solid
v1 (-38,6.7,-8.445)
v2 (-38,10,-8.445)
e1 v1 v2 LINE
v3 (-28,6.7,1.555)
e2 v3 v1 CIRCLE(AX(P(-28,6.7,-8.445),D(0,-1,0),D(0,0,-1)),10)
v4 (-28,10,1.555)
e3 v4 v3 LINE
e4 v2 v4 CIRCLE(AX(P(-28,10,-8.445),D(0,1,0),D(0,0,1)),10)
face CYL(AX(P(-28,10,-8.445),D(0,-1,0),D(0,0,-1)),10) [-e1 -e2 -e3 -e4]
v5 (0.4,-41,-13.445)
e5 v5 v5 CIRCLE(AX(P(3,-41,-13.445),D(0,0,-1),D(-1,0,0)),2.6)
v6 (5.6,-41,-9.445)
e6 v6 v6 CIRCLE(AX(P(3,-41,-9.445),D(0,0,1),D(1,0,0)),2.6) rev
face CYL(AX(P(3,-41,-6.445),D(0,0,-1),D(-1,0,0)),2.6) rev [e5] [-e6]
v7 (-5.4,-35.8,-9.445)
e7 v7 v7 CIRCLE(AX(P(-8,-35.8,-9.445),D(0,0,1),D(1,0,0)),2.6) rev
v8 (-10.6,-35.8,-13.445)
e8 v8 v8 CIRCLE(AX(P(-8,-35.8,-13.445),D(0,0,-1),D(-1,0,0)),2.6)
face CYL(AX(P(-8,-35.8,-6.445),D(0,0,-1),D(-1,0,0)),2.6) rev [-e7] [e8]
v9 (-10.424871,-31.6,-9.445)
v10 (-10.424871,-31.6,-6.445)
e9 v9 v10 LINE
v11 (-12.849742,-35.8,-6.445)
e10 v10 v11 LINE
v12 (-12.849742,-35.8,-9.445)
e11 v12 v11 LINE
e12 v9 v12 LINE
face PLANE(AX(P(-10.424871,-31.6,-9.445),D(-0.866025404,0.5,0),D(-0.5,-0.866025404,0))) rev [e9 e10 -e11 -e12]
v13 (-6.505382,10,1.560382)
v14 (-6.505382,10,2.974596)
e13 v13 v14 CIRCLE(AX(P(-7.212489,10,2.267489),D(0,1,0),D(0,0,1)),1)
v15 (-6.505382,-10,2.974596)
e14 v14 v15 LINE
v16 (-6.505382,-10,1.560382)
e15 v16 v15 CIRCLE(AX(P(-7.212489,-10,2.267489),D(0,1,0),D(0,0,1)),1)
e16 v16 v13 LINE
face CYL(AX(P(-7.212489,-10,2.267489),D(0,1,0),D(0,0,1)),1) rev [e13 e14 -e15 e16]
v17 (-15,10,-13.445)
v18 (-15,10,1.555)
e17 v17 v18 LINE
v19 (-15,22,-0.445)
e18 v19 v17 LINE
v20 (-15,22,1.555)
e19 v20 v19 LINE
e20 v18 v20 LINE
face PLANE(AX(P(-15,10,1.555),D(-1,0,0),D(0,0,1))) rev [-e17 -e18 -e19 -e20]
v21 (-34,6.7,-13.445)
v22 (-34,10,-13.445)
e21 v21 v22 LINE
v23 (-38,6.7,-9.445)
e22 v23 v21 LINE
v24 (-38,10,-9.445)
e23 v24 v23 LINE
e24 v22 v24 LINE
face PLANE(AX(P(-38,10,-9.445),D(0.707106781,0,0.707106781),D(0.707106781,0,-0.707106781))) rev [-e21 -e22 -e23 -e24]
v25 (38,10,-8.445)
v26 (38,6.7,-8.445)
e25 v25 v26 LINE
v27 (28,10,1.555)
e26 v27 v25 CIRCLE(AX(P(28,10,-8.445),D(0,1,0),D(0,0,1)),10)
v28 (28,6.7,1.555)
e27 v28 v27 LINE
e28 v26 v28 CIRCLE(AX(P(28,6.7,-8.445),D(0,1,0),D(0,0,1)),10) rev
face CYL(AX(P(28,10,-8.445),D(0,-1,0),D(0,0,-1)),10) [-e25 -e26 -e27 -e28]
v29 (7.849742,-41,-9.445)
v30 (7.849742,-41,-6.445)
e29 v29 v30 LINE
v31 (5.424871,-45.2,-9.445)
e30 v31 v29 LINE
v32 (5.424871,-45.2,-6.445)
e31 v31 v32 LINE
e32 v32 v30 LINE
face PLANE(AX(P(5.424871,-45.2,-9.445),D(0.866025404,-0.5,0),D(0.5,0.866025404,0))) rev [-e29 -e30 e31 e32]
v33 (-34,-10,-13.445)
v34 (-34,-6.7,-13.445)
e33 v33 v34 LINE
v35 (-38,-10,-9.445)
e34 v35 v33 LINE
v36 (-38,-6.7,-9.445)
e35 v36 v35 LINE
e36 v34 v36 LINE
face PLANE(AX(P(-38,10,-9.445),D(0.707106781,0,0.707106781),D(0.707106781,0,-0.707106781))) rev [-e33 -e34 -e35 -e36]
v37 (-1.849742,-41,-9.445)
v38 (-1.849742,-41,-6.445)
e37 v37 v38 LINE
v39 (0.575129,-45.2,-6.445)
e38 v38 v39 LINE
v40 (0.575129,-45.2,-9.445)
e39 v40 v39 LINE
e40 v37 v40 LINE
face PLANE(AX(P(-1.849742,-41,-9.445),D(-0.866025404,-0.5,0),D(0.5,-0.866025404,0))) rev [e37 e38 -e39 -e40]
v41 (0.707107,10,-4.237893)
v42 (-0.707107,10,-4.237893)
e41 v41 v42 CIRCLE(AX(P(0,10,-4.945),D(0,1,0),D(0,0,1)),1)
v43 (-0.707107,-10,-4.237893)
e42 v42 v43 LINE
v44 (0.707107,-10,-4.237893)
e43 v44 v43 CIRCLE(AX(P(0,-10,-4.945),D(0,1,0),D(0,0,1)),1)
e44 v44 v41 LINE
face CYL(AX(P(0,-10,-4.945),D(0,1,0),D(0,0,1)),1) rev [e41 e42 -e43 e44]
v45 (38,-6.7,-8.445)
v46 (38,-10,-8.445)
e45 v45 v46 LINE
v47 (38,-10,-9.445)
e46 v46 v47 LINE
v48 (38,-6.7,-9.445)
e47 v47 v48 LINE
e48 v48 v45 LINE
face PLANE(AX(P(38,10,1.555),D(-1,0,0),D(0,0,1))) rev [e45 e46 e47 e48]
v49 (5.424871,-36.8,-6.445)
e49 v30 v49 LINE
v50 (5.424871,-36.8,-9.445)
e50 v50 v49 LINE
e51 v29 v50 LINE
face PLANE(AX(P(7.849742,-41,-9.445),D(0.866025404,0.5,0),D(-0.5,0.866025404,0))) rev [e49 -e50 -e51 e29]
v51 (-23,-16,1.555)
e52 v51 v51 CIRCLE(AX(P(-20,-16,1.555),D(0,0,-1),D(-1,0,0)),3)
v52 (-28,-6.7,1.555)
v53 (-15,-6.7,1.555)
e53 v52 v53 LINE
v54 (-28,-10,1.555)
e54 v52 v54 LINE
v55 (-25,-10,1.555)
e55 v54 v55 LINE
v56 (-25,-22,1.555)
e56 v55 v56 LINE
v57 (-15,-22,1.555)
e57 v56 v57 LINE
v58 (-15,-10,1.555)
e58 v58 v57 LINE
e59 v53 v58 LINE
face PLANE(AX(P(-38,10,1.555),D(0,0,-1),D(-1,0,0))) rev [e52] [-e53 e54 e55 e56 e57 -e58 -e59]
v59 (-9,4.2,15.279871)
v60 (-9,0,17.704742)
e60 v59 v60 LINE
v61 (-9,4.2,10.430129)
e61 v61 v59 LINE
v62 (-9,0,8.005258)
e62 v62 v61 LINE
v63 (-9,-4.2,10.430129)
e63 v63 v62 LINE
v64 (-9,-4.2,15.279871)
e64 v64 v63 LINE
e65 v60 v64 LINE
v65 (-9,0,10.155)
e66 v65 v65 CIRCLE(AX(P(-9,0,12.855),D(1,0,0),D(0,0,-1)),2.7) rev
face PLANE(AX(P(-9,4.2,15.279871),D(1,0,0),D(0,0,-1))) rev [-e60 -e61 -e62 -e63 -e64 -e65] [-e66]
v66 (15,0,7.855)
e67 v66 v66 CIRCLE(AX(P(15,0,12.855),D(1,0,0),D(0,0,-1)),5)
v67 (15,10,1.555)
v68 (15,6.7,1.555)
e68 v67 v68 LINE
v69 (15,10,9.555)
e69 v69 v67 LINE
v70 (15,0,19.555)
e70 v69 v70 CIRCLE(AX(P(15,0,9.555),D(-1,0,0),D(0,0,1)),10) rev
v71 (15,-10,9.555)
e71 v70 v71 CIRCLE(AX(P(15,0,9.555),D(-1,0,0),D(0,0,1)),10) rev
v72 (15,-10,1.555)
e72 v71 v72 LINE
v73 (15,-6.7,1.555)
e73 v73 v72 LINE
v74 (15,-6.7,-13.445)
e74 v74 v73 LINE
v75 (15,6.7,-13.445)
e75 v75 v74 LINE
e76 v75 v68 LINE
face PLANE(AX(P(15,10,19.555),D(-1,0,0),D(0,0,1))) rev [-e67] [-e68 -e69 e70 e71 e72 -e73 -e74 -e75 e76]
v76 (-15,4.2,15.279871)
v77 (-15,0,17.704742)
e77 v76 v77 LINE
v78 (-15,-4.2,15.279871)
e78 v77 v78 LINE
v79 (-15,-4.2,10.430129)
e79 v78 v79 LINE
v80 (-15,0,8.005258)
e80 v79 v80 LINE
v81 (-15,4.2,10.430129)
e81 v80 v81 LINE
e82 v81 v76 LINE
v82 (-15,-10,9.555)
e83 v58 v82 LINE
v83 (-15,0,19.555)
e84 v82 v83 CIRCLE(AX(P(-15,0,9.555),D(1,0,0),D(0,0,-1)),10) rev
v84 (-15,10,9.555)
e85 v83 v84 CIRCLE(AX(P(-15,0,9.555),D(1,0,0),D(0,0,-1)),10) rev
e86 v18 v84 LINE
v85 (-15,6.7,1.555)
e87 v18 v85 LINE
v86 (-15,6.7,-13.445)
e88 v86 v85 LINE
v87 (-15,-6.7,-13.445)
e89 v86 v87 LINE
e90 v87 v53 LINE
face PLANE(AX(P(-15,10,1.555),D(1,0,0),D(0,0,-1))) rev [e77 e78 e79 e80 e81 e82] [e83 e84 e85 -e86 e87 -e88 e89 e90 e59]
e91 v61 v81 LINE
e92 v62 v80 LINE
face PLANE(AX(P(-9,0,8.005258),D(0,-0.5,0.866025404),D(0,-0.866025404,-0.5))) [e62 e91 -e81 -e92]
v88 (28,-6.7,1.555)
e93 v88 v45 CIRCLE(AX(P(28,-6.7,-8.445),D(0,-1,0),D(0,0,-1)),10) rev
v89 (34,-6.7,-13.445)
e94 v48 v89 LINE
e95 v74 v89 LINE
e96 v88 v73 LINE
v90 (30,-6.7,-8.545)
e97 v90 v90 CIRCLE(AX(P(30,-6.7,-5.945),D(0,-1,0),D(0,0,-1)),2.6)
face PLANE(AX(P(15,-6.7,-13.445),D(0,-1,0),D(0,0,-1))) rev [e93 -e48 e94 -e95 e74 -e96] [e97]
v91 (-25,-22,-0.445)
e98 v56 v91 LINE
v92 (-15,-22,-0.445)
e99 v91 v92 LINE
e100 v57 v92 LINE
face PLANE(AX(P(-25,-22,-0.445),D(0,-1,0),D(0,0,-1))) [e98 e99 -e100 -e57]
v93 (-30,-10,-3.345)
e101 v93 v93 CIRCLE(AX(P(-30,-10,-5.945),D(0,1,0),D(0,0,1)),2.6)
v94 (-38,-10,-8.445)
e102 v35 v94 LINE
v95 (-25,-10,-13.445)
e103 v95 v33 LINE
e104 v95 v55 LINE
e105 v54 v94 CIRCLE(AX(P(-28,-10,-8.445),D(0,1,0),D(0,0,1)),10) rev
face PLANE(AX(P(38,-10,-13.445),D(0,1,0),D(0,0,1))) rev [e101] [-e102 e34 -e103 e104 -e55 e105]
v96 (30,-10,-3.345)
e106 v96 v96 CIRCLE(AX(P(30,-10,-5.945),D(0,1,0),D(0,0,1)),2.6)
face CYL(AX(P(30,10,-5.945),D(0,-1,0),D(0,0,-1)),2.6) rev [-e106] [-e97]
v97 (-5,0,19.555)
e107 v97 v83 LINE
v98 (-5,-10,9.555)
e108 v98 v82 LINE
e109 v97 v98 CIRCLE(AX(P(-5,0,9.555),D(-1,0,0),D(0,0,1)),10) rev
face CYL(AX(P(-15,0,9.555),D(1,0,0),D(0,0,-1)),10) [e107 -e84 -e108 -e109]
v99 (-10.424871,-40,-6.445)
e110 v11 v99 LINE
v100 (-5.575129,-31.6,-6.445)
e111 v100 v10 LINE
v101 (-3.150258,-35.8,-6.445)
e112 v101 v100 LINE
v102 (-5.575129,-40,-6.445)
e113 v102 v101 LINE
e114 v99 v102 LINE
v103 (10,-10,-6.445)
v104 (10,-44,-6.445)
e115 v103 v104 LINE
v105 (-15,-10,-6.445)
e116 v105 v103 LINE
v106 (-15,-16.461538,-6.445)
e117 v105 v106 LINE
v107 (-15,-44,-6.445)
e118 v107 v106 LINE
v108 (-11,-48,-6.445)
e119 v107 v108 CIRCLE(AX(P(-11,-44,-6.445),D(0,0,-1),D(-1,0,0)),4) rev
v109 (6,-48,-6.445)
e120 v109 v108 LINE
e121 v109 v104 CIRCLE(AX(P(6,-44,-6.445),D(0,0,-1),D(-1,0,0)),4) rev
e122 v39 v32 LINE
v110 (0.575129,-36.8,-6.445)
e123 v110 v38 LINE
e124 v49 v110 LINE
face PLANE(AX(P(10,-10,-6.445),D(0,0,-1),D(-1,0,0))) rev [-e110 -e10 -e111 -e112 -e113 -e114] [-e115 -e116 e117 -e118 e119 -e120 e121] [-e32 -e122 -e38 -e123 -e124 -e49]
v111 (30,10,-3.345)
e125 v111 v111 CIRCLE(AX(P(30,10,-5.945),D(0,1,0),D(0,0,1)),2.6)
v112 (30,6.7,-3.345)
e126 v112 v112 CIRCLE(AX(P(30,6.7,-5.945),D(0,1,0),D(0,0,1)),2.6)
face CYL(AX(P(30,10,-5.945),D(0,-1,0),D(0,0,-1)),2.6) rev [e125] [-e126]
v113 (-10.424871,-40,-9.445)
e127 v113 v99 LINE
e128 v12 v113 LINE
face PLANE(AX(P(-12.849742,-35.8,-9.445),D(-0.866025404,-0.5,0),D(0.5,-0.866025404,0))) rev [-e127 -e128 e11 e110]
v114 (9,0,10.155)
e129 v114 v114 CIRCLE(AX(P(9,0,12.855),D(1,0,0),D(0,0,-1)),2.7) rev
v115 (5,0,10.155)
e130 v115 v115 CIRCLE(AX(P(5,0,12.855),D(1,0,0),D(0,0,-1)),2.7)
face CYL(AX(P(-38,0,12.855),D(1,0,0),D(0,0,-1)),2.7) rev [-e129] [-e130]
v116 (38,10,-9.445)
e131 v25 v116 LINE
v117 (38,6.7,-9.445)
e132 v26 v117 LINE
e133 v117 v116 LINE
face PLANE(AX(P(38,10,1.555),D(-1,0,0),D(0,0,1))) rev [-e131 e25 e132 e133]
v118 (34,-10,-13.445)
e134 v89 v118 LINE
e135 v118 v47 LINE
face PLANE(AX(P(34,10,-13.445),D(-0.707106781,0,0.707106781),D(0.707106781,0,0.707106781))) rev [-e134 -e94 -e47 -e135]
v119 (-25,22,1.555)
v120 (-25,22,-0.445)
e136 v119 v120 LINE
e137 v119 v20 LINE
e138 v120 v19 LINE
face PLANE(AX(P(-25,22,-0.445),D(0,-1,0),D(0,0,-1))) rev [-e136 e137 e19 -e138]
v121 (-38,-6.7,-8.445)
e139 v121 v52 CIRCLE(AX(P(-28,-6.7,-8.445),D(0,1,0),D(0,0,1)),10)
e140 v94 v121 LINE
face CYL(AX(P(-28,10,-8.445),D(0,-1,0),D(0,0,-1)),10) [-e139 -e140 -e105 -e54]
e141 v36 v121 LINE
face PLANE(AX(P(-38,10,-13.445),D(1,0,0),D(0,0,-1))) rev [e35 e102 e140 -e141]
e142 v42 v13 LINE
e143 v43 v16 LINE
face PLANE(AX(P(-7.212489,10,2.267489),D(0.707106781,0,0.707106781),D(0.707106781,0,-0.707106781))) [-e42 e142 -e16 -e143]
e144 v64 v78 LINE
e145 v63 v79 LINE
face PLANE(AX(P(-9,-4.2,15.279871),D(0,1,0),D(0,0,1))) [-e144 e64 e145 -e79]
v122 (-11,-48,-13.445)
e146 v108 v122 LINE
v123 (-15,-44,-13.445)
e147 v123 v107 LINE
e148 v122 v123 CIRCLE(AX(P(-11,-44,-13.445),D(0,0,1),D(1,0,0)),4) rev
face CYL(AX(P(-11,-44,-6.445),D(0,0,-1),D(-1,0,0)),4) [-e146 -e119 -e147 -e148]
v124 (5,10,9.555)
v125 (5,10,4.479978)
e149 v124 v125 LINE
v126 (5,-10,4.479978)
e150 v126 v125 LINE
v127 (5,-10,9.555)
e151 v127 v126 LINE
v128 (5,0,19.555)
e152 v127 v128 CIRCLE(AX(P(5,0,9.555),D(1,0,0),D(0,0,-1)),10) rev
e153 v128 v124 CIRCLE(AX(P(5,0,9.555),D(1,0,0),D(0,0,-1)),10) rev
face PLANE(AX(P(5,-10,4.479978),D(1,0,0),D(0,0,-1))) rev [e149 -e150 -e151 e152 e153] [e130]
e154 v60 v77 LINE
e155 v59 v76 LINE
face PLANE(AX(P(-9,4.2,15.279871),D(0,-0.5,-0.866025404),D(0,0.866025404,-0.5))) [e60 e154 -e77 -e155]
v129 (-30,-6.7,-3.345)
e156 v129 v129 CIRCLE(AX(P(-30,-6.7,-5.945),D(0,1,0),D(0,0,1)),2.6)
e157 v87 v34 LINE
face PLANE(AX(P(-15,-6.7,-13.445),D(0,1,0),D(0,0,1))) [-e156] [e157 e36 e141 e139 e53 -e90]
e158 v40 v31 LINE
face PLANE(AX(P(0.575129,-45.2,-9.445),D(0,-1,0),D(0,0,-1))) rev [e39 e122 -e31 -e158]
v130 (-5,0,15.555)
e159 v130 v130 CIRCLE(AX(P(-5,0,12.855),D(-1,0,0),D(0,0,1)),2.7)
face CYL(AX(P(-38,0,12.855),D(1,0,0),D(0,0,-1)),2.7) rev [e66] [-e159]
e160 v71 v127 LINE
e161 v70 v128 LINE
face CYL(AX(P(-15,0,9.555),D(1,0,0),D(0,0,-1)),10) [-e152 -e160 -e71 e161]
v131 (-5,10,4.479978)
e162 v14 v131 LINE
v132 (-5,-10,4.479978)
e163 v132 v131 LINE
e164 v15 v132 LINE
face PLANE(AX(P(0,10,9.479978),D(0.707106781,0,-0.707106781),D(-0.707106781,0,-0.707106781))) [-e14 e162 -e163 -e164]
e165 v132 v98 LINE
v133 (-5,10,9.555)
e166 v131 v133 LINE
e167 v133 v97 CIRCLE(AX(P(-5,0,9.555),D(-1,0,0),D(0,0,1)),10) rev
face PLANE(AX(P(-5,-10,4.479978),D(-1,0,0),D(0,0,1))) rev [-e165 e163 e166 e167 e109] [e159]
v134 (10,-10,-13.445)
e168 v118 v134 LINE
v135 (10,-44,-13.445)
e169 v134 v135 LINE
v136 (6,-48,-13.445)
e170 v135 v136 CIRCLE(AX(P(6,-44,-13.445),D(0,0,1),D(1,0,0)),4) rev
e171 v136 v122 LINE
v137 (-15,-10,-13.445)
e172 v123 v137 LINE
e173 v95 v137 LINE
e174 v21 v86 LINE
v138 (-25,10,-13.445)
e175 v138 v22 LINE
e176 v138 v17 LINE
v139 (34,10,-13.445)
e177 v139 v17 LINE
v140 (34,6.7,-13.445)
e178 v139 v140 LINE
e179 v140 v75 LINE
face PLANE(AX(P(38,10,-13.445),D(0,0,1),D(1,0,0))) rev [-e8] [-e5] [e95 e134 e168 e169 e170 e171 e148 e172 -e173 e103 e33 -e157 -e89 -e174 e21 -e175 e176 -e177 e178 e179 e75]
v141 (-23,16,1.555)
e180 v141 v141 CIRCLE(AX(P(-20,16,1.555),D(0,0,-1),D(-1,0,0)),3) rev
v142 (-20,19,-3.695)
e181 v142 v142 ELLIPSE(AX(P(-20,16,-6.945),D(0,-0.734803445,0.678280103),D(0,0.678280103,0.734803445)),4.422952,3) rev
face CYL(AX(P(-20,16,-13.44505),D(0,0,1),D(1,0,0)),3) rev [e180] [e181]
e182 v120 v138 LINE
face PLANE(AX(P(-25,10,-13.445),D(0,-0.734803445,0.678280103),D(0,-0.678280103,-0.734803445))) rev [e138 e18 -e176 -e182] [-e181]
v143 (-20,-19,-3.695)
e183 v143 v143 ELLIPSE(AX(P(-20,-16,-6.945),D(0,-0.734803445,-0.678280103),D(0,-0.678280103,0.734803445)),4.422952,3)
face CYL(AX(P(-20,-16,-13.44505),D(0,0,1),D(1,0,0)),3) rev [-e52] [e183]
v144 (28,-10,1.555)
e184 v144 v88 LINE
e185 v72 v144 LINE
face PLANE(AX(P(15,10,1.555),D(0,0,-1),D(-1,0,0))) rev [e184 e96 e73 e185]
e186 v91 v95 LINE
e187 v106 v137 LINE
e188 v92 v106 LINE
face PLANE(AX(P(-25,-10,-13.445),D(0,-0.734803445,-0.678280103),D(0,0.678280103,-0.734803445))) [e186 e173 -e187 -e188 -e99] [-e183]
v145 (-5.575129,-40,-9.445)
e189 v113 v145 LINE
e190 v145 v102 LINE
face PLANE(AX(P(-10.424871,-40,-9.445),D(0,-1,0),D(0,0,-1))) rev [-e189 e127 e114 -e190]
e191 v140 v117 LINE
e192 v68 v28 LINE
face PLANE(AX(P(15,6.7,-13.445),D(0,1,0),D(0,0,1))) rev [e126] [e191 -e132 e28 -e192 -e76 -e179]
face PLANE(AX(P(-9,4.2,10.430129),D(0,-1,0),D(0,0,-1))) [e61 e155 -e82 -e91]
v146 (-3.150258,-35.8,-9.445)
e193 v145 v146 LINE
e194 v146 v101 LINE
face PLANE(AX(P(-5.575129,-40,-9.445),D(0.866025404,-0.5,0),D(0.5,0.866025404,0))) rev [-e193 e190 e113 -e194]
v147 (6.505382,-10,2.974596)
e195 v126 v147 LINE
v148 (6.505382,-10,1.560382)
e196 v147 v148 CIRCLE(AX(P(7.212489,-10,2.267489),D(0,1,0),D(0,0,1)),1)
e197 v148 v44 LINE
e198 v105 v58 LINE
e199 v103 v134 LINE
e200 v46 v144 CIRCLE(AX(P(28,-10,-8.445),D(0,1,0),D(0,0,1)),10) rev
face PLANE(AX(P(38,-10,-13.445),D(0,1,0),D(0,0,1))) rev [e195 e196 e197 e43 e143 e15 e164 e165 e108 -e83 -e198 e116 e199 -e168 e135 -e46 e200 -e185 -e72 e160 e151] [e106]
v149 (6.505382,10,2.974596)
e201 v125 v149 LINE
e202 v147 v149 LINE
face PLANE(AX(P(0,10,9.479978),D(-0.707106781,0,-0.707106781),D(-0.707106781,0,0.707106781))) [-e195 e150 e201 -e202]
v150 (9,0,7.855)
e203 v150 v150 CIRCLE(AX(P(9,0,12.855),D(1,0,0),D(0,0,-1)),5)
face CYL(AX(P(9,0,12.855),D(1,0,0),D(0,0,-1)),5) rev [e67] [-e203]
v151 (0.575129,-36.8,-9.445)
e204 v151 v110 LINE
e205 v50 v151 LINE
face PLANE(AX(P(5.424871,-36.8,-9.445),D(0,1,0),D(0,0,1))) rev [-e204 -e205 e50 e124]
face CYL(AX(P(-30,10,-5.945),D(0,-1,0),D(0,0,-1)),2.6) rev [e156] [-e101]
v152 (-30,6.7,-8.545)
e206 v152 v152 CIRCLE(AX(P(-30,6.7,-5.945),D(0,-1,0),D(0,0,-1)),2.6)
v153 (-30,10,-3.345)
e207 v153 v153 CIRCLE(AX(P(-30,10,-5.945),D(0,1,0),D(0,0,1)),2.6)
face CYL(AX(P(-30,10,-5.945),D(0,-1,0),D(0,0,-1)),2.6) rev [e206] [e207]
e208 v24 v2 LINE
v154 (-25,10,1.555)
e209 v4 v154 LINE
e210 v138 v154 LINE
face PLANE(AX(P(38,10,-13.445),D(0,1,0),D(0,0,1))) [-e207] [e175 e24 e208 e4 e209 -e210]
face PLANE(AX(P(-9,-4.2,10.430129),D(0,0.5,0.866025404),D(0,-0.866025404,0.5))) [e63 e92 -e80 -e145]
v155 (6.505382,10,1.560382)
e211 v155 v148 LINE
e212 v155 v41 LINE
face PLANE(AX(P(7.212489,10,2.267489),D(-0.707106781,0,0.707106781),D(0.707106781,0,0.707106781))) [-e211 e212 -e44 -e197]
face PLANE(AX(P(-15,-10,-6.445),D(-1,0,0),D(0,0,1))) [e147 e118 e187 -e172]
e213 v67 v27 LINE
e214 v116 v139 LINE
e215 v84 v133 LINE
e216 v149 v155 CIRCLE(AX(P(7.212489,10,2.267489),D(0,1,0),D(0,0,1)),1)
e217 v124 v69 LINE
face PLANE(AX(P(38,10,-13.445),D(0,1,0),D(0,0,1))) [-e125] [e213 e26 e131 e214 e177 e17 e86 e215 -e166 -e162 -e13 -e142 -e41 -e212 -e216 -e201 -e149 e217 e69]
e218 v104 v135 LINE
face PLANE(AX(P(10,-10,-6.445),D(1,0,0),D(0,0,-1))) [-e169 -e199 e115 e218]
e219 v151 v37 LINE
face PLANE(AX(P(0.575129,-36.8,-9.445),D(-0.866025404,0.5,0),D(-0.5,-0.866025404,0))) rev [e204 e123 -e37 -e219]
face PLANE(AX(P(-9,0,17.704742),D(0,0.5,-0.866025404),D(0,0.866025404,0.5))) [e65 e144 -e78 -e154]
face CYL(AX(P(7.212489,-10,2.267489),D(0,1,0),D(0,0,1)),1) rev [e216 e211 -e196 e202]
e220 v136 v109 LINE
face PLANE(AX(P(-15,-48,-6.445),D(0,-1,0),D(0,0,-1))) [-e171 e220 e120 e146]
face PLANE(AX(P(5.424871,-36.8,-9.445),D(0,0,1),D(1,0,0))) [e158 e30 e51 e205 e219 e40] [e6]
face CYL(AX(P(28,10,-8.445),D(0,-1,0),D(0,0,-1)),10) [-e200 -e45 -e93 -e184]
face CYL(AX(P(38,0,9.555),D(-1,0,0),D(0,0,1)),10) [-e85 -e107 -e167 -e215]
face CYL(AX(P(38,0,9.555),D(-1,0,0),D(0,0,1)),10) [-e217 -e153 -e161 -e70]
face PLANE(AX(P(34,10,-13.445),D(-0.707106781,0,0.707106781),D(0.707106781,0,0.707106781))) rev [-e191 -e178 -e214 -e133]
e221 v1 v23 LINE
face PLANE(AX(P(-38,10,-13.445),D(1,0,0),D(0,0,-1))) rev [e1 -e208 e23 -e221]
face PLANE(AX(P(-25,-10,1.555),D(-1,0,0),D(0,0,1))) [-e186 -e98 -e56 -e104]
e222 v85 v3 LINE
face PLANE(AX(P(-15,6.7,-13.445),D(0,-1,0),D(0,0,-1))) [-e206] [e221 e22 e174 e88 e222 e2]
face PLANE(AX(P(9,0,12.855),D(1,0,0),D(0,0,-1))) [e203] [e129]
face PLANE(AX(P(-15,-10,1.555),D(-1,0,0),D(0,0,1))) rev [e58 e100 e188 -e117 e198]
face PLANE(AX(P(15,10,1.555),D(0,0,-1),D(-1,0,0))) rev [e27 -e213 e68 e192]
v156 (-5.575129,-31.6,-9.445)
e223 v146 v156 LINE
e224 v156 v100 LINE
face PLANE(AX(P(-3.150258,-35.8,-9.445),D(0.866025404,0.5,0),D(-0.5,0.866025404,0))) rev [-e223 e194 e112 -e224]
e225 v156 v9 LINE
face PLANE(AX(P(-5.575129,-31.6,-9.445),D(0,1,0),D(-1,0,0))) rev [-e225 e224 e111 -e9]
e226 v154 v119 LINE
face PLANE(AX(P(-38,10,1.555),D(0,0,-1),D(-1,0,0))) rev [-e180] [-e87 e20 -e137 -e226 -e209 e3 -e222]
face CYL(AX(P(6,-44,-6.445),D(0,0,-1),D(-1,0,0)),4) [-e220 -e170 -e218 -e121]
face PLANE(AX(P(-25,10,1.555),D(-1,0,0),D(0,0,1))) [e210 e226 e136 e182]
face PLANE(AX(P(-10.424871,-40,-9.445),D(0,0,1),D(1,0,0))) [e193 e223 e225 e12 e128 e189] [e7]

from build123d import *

# Parameters (mm, degrees)
SKIZZE2_R                            = 2.6
AUFSATZ_LINEAR_AUSTRAGEN1_DEPTH      = 10
SCHNITT_LINEAR_AUSTRAGEN1_DEPTH      = 44.890751019
SCHNITT_LINEAR_AUSTRAGEN1_DEPTH_BACK = 44.890751019
SKIZZE3_R                            = 1
SKIZZE3_W                            = 10
SKIZZE3_H                            = 22.630927951
SKIZZE4_W                            = 30
SKIZZE4_H                            = 13.4
SCHNITT_LINEAR_AUSTRAGEN2_DEPTH      = 44.890751019
SCHNITT_LINEAR_AUSTRAGEN3_DEPTH      = 44.890751019
SCHNITT_LINEAR_AUSTRAGEN3_DEPTH_BACK = 44.890751019
SKIZZE5_R                            = 2.7
SCHNITT_LINEAR_START                 = 15
SKIZZE6_R                            = 5
SCHNITT_LINEAR_AUSTRAGEN4_DEPTH      = 6
SCHNITT_LINEAR_START_2               = -15
SCHNITT_LINEAR_AUSTRAGEN5_DEPTH      = 6
AUFSATZ_LINEAR_START                 = -15
AUFSATZ_LINEAR_AUSTRAGEN2_DEPTH      = 10
SKIZZE10_R                           = 3
SCHNITT_LINEAR_AUSTRAGEN6_DEPTH      = 49.06659989
FASE1_SIZE                           = 4
VERRUNDUNG1_R                        = 10
VERRUNDUNG2_R                        = 10
SKIZZE11_R                           = 2.6
AUFSATZ_LINEAR_AUSTRAGEN3_DEPTH      = 7
VERRUNDUNG3_R                        = 4
SCHNITT_LINEAR_AUSTRAGEN7_DEPTH      = 3


with BuildPart() as part:
    # Skizze2 → Aufsatz-Linear austragen1 (new, symmetric)
    with BuildSketch(Plane(origin=(0, 0, 0), x_dir=(1, 0, 0), z_dir=(0, 1, 0))):
        Polygon((38, 13.445), (-38, 13.445), (-38, -1.555), (-15, -1.555), (-15, -19.555), (15, -19.555), (15, -1.555), (38, -1.555), align=None)
        with Locations(Location((-30, 5.945, 0), (0, 0, 270))):
            Circle(SKIZZE2_R, mode=Mode.SUBTRACT)
        with Locations(Location((30, 5.945, 0), (0, 0, 270))):
            Circle(SKIZZE2_R, mode=Mode.SUBTRACT)
        Polygon((0, -9.479978336), (7.212489168, -2.267489168), (0, 4.945), (-7.212489168, -2.267489168), align=None, mode=Mode.SUBTRACT)
    extrude(amount=AUFSATZ_LINEAR_AUSTRAGEN1_DEPTH, both=True)

    # Skizze3 → Schnitt-Linear austragen1 (cut, two sides: drawn at the far end of the back side and taken through both)
    with BuildSketch(Plane(origin=(0, 0, 0), x_dir=(1, 0, 0), z_dir=(0, 1, 0)).offset(-SCHNITT_LINEAR_AUSTRAGEN1_DEPTH_BACK)):
        with Locations((0, 4.945)):
            Circle(SKIZZE3_R)
        with Locations((-7.212489168, -2.267489168)):
            Circle(SKIZZE3_R)
        with Locations((7.212489168, -2.267489168)):
            Circle(SKIZZE3_R)
        with Locations((0, -15.795442312)):
            Rectangle(SKIZZE3_W, SKIZZE3_H)
    extrude(amount=SCHNITT_LINEAR_AUSTRAGEN1_DEPTH + SCHNITT_LINEAR_AUSTRAGEN1_DEPTH_BACK, mode=Mode.SUBTRACT)

    # Skizze4 → Schnitt-Linear austragen2 (cut, symmetric)
    with BuildSketch(Plane.XY):
        with Locations((30, 0)):
            Rectangle(SKIZZE4_W, SKIZZE4_H)
    schnitt_linear_austragen2 = extrude(amount=SCHNITT_LINEAR_AUSTRAGEN2_DEPTH, both=True, mode=Mode.SUBTRACT)

    # Spiegeln1: Schnitt-Linear austragen2 across plane
    add(schnitt_linear_austragen2.mirror(Plane(origin=(0, 0, 0), x_dir=(0, 0, 1), z_dir=(1, 0, 0))), mode=Mode.SUBTRACT)

    # Skizze5 → Schnitt-Linear austragen3 (cut, two sides: drawn at the far end of the back side and taken through both)
    with BuildSketch(Plane(origin=(0, 0, 0), x_dir=(0, 0, -1), z_dir=(1, 0, 0)).offset(-SCHNITT_LINEAR_AUSTRAGEN3_DEPTH_BACK)):
        with Locations((-12.855, 0)):
            Circle(SKIZZE5_R)
    extrude(amount=SCHNITT_LINEAR_AUSTRAGEN3_DEPTH + SCHNITT_LINEAR_AUSTRAGEN3_DEPTH_BACK, mode=Mode.SUBTRACT)

    # Skizze6 → Schnitt-Linear austragen4 (cut)
    with BuildSketch(Plane(origin=(0, 0, 0), x_dir=(0, 0, -1), z_dir=(1, 0, 0)).offset(SCHNITT_LINEAR_START)):
        with Locations((-12.855, 0)):
            Circle(SKIZZE6_R)
    extrude(amount=-SCHNITT_LINEAR_AUSTRAGEN4_DEPTH, mode=Mode.SUBTRACT)

    # Skizze7 → Schnitt-Linear austragen5 (cut)
    with BuildSketch(Plane(origin=(0, 0, 0), x_dir=(0, 0, -1), z_dir=(1, 0, 0)).offset(SCHNITT_LINEAR_START_2)):
        Polygon((-15.279871131, 4.2), (-17.704742261, 0), (-15.279871131, -4.2), (-10.430128869, -4.2), (-8.005257739, 0), (-10.430128869, 4.2), align=None)
    extrude(amount=SCHNITT_LINEAR_AUSTRAGEN5_DEPTH, mode=Mode.SUBTRACT)

    # Skizze9 → Aufsatz-Linear austragen2 (add)
    with BuildSketch(Plane(origin=(0, 0, 0), x_dir=(0, 0, -1), z_dir=(1, 0, 0)).offset(AUFSATZ_LINEAR_START)):
        Polygon((-1.555, -10), (13.445, -10), (0.445, -22), (-1.555, -22), align=None)
    aufsatz_linear_austragen2 = extrude(amount=-AUFSATZ_LINEAR_AUSTRAGEN2_DEPTH)

    # Spiegeln2: Aufsatz-Linear austragen2 across plane
    add(aufsatz_linear_austragen2.mirror(Plane.ZX))

    # Skizze10 → Schnitt-Linear austragen6 (cut, symmetric)
    with BuildSketch(Plane.XY):
        with Locations(Location((-20, -16, 0), (0, 0, 270))):
            Circle(SKIZZE10_R)
    schnitt_linear_austragen6 = extrude(amount=SCHNITT_LINEAR_AUSTRAGEN6_DEPTH, both=True, mode=Mode.SUBTRACT)

    # Spiegeln3: Schnitt-Linear austragen6 across plane
    add(schnitt_linear_austragen6.mirror(Plane.ZX), mode=Mode.SUBTRACT)

    # Fase1
    fase1_edges = [part.edges().sort_by_distance(p)[0] for p in [
        (-38, 8.35, -13.445),
        (-38, -8.35, -13.445),
        (38, 8.35, -13.445),
        (38, -8.35, -13.445),
    ]]
    chamfer(fase1_edges, length=FASE1_SIZE)

    # Verrundung1
    verrundung1_edges = [part.edges().sort_by_distance(p)[0] for p in [
        (38, 8.35, 1.555),
        (38, -8.35, 1.555),
        (-38, -8.35, 1.555),
        (-38, 8.35, 1.555),
    ]]
    fillet(verrundung1_edges, radius=VERRUNDUNG1_R)

    # Verrundung2
    verrundung2_edges = [part.edges().sort_by_distance(p)[0] for p in [
        (10, -10, 19.555),
        (-10, -10, 19.555),
        (-10, 10, 19.555),
        (10, 10, 19.555),
    ]]
    fillet(verrundung2_edges, radius=VERRUNDUNG2_R - 0.0001)  # a hair under: the kernel refuses the full size

    # Skizze11 → Aufsatz-Linear austragen3 (add)
    with BuildSketch(Plane(origin=(0, 0, -13.445), x_dir=(-1, 0, 0), z_dir=(0, 0, -1))):
        Polygon((10, -10), (15, -10), (15, -48), (-10, -48), (-10, -10), align=None)
        with Locations((-3, -41)):
            Circle(SKIZZE11_R, mode=Mode.SUBTRACT)
        with Locations((8, -35.8)):
            Circle(SKIZZE11_R, mode=Mode.SUBTRACT)
    extrude(amount=-AUFSATZ_LINEAR_AUSTRAGEN3_DEPTH)

    # Verrundung3
    verrundung3_edges = [part.edges().sort_by_distance(p)[0] for p in [
        (10, -48, -9.945),
        (-15, -48, -9.945),
    ]]
    fillet(verrundung3_edges, radius=VERRUNDUNG3_R)

    # Skizze12 → Schnitt-Linear austragen7 (cut)
    with BuildSketch(Plane.XY.offset(-6.445)):
        Polygon((5.424871131, -36.8), (0.575128869, -36.8), (-1.849742261, -41), (0.575128869, -45.2), (5.424871131, -45.2), (7.849742261, -41), align=None)
        Polygon((-10.424871131, -40), (-5.575128869, -40), (-3.150257739, -35.8), (-5.575128869, -31.6), (-10.424871131, -31.6), (-12.849742261, -35.8), align=None)
    extrude(amount=-SCHNITT_LINEAR_AUSTRAGEN7_DEPTH, mode=Mode.SUBTRACT)


solid = part.part
